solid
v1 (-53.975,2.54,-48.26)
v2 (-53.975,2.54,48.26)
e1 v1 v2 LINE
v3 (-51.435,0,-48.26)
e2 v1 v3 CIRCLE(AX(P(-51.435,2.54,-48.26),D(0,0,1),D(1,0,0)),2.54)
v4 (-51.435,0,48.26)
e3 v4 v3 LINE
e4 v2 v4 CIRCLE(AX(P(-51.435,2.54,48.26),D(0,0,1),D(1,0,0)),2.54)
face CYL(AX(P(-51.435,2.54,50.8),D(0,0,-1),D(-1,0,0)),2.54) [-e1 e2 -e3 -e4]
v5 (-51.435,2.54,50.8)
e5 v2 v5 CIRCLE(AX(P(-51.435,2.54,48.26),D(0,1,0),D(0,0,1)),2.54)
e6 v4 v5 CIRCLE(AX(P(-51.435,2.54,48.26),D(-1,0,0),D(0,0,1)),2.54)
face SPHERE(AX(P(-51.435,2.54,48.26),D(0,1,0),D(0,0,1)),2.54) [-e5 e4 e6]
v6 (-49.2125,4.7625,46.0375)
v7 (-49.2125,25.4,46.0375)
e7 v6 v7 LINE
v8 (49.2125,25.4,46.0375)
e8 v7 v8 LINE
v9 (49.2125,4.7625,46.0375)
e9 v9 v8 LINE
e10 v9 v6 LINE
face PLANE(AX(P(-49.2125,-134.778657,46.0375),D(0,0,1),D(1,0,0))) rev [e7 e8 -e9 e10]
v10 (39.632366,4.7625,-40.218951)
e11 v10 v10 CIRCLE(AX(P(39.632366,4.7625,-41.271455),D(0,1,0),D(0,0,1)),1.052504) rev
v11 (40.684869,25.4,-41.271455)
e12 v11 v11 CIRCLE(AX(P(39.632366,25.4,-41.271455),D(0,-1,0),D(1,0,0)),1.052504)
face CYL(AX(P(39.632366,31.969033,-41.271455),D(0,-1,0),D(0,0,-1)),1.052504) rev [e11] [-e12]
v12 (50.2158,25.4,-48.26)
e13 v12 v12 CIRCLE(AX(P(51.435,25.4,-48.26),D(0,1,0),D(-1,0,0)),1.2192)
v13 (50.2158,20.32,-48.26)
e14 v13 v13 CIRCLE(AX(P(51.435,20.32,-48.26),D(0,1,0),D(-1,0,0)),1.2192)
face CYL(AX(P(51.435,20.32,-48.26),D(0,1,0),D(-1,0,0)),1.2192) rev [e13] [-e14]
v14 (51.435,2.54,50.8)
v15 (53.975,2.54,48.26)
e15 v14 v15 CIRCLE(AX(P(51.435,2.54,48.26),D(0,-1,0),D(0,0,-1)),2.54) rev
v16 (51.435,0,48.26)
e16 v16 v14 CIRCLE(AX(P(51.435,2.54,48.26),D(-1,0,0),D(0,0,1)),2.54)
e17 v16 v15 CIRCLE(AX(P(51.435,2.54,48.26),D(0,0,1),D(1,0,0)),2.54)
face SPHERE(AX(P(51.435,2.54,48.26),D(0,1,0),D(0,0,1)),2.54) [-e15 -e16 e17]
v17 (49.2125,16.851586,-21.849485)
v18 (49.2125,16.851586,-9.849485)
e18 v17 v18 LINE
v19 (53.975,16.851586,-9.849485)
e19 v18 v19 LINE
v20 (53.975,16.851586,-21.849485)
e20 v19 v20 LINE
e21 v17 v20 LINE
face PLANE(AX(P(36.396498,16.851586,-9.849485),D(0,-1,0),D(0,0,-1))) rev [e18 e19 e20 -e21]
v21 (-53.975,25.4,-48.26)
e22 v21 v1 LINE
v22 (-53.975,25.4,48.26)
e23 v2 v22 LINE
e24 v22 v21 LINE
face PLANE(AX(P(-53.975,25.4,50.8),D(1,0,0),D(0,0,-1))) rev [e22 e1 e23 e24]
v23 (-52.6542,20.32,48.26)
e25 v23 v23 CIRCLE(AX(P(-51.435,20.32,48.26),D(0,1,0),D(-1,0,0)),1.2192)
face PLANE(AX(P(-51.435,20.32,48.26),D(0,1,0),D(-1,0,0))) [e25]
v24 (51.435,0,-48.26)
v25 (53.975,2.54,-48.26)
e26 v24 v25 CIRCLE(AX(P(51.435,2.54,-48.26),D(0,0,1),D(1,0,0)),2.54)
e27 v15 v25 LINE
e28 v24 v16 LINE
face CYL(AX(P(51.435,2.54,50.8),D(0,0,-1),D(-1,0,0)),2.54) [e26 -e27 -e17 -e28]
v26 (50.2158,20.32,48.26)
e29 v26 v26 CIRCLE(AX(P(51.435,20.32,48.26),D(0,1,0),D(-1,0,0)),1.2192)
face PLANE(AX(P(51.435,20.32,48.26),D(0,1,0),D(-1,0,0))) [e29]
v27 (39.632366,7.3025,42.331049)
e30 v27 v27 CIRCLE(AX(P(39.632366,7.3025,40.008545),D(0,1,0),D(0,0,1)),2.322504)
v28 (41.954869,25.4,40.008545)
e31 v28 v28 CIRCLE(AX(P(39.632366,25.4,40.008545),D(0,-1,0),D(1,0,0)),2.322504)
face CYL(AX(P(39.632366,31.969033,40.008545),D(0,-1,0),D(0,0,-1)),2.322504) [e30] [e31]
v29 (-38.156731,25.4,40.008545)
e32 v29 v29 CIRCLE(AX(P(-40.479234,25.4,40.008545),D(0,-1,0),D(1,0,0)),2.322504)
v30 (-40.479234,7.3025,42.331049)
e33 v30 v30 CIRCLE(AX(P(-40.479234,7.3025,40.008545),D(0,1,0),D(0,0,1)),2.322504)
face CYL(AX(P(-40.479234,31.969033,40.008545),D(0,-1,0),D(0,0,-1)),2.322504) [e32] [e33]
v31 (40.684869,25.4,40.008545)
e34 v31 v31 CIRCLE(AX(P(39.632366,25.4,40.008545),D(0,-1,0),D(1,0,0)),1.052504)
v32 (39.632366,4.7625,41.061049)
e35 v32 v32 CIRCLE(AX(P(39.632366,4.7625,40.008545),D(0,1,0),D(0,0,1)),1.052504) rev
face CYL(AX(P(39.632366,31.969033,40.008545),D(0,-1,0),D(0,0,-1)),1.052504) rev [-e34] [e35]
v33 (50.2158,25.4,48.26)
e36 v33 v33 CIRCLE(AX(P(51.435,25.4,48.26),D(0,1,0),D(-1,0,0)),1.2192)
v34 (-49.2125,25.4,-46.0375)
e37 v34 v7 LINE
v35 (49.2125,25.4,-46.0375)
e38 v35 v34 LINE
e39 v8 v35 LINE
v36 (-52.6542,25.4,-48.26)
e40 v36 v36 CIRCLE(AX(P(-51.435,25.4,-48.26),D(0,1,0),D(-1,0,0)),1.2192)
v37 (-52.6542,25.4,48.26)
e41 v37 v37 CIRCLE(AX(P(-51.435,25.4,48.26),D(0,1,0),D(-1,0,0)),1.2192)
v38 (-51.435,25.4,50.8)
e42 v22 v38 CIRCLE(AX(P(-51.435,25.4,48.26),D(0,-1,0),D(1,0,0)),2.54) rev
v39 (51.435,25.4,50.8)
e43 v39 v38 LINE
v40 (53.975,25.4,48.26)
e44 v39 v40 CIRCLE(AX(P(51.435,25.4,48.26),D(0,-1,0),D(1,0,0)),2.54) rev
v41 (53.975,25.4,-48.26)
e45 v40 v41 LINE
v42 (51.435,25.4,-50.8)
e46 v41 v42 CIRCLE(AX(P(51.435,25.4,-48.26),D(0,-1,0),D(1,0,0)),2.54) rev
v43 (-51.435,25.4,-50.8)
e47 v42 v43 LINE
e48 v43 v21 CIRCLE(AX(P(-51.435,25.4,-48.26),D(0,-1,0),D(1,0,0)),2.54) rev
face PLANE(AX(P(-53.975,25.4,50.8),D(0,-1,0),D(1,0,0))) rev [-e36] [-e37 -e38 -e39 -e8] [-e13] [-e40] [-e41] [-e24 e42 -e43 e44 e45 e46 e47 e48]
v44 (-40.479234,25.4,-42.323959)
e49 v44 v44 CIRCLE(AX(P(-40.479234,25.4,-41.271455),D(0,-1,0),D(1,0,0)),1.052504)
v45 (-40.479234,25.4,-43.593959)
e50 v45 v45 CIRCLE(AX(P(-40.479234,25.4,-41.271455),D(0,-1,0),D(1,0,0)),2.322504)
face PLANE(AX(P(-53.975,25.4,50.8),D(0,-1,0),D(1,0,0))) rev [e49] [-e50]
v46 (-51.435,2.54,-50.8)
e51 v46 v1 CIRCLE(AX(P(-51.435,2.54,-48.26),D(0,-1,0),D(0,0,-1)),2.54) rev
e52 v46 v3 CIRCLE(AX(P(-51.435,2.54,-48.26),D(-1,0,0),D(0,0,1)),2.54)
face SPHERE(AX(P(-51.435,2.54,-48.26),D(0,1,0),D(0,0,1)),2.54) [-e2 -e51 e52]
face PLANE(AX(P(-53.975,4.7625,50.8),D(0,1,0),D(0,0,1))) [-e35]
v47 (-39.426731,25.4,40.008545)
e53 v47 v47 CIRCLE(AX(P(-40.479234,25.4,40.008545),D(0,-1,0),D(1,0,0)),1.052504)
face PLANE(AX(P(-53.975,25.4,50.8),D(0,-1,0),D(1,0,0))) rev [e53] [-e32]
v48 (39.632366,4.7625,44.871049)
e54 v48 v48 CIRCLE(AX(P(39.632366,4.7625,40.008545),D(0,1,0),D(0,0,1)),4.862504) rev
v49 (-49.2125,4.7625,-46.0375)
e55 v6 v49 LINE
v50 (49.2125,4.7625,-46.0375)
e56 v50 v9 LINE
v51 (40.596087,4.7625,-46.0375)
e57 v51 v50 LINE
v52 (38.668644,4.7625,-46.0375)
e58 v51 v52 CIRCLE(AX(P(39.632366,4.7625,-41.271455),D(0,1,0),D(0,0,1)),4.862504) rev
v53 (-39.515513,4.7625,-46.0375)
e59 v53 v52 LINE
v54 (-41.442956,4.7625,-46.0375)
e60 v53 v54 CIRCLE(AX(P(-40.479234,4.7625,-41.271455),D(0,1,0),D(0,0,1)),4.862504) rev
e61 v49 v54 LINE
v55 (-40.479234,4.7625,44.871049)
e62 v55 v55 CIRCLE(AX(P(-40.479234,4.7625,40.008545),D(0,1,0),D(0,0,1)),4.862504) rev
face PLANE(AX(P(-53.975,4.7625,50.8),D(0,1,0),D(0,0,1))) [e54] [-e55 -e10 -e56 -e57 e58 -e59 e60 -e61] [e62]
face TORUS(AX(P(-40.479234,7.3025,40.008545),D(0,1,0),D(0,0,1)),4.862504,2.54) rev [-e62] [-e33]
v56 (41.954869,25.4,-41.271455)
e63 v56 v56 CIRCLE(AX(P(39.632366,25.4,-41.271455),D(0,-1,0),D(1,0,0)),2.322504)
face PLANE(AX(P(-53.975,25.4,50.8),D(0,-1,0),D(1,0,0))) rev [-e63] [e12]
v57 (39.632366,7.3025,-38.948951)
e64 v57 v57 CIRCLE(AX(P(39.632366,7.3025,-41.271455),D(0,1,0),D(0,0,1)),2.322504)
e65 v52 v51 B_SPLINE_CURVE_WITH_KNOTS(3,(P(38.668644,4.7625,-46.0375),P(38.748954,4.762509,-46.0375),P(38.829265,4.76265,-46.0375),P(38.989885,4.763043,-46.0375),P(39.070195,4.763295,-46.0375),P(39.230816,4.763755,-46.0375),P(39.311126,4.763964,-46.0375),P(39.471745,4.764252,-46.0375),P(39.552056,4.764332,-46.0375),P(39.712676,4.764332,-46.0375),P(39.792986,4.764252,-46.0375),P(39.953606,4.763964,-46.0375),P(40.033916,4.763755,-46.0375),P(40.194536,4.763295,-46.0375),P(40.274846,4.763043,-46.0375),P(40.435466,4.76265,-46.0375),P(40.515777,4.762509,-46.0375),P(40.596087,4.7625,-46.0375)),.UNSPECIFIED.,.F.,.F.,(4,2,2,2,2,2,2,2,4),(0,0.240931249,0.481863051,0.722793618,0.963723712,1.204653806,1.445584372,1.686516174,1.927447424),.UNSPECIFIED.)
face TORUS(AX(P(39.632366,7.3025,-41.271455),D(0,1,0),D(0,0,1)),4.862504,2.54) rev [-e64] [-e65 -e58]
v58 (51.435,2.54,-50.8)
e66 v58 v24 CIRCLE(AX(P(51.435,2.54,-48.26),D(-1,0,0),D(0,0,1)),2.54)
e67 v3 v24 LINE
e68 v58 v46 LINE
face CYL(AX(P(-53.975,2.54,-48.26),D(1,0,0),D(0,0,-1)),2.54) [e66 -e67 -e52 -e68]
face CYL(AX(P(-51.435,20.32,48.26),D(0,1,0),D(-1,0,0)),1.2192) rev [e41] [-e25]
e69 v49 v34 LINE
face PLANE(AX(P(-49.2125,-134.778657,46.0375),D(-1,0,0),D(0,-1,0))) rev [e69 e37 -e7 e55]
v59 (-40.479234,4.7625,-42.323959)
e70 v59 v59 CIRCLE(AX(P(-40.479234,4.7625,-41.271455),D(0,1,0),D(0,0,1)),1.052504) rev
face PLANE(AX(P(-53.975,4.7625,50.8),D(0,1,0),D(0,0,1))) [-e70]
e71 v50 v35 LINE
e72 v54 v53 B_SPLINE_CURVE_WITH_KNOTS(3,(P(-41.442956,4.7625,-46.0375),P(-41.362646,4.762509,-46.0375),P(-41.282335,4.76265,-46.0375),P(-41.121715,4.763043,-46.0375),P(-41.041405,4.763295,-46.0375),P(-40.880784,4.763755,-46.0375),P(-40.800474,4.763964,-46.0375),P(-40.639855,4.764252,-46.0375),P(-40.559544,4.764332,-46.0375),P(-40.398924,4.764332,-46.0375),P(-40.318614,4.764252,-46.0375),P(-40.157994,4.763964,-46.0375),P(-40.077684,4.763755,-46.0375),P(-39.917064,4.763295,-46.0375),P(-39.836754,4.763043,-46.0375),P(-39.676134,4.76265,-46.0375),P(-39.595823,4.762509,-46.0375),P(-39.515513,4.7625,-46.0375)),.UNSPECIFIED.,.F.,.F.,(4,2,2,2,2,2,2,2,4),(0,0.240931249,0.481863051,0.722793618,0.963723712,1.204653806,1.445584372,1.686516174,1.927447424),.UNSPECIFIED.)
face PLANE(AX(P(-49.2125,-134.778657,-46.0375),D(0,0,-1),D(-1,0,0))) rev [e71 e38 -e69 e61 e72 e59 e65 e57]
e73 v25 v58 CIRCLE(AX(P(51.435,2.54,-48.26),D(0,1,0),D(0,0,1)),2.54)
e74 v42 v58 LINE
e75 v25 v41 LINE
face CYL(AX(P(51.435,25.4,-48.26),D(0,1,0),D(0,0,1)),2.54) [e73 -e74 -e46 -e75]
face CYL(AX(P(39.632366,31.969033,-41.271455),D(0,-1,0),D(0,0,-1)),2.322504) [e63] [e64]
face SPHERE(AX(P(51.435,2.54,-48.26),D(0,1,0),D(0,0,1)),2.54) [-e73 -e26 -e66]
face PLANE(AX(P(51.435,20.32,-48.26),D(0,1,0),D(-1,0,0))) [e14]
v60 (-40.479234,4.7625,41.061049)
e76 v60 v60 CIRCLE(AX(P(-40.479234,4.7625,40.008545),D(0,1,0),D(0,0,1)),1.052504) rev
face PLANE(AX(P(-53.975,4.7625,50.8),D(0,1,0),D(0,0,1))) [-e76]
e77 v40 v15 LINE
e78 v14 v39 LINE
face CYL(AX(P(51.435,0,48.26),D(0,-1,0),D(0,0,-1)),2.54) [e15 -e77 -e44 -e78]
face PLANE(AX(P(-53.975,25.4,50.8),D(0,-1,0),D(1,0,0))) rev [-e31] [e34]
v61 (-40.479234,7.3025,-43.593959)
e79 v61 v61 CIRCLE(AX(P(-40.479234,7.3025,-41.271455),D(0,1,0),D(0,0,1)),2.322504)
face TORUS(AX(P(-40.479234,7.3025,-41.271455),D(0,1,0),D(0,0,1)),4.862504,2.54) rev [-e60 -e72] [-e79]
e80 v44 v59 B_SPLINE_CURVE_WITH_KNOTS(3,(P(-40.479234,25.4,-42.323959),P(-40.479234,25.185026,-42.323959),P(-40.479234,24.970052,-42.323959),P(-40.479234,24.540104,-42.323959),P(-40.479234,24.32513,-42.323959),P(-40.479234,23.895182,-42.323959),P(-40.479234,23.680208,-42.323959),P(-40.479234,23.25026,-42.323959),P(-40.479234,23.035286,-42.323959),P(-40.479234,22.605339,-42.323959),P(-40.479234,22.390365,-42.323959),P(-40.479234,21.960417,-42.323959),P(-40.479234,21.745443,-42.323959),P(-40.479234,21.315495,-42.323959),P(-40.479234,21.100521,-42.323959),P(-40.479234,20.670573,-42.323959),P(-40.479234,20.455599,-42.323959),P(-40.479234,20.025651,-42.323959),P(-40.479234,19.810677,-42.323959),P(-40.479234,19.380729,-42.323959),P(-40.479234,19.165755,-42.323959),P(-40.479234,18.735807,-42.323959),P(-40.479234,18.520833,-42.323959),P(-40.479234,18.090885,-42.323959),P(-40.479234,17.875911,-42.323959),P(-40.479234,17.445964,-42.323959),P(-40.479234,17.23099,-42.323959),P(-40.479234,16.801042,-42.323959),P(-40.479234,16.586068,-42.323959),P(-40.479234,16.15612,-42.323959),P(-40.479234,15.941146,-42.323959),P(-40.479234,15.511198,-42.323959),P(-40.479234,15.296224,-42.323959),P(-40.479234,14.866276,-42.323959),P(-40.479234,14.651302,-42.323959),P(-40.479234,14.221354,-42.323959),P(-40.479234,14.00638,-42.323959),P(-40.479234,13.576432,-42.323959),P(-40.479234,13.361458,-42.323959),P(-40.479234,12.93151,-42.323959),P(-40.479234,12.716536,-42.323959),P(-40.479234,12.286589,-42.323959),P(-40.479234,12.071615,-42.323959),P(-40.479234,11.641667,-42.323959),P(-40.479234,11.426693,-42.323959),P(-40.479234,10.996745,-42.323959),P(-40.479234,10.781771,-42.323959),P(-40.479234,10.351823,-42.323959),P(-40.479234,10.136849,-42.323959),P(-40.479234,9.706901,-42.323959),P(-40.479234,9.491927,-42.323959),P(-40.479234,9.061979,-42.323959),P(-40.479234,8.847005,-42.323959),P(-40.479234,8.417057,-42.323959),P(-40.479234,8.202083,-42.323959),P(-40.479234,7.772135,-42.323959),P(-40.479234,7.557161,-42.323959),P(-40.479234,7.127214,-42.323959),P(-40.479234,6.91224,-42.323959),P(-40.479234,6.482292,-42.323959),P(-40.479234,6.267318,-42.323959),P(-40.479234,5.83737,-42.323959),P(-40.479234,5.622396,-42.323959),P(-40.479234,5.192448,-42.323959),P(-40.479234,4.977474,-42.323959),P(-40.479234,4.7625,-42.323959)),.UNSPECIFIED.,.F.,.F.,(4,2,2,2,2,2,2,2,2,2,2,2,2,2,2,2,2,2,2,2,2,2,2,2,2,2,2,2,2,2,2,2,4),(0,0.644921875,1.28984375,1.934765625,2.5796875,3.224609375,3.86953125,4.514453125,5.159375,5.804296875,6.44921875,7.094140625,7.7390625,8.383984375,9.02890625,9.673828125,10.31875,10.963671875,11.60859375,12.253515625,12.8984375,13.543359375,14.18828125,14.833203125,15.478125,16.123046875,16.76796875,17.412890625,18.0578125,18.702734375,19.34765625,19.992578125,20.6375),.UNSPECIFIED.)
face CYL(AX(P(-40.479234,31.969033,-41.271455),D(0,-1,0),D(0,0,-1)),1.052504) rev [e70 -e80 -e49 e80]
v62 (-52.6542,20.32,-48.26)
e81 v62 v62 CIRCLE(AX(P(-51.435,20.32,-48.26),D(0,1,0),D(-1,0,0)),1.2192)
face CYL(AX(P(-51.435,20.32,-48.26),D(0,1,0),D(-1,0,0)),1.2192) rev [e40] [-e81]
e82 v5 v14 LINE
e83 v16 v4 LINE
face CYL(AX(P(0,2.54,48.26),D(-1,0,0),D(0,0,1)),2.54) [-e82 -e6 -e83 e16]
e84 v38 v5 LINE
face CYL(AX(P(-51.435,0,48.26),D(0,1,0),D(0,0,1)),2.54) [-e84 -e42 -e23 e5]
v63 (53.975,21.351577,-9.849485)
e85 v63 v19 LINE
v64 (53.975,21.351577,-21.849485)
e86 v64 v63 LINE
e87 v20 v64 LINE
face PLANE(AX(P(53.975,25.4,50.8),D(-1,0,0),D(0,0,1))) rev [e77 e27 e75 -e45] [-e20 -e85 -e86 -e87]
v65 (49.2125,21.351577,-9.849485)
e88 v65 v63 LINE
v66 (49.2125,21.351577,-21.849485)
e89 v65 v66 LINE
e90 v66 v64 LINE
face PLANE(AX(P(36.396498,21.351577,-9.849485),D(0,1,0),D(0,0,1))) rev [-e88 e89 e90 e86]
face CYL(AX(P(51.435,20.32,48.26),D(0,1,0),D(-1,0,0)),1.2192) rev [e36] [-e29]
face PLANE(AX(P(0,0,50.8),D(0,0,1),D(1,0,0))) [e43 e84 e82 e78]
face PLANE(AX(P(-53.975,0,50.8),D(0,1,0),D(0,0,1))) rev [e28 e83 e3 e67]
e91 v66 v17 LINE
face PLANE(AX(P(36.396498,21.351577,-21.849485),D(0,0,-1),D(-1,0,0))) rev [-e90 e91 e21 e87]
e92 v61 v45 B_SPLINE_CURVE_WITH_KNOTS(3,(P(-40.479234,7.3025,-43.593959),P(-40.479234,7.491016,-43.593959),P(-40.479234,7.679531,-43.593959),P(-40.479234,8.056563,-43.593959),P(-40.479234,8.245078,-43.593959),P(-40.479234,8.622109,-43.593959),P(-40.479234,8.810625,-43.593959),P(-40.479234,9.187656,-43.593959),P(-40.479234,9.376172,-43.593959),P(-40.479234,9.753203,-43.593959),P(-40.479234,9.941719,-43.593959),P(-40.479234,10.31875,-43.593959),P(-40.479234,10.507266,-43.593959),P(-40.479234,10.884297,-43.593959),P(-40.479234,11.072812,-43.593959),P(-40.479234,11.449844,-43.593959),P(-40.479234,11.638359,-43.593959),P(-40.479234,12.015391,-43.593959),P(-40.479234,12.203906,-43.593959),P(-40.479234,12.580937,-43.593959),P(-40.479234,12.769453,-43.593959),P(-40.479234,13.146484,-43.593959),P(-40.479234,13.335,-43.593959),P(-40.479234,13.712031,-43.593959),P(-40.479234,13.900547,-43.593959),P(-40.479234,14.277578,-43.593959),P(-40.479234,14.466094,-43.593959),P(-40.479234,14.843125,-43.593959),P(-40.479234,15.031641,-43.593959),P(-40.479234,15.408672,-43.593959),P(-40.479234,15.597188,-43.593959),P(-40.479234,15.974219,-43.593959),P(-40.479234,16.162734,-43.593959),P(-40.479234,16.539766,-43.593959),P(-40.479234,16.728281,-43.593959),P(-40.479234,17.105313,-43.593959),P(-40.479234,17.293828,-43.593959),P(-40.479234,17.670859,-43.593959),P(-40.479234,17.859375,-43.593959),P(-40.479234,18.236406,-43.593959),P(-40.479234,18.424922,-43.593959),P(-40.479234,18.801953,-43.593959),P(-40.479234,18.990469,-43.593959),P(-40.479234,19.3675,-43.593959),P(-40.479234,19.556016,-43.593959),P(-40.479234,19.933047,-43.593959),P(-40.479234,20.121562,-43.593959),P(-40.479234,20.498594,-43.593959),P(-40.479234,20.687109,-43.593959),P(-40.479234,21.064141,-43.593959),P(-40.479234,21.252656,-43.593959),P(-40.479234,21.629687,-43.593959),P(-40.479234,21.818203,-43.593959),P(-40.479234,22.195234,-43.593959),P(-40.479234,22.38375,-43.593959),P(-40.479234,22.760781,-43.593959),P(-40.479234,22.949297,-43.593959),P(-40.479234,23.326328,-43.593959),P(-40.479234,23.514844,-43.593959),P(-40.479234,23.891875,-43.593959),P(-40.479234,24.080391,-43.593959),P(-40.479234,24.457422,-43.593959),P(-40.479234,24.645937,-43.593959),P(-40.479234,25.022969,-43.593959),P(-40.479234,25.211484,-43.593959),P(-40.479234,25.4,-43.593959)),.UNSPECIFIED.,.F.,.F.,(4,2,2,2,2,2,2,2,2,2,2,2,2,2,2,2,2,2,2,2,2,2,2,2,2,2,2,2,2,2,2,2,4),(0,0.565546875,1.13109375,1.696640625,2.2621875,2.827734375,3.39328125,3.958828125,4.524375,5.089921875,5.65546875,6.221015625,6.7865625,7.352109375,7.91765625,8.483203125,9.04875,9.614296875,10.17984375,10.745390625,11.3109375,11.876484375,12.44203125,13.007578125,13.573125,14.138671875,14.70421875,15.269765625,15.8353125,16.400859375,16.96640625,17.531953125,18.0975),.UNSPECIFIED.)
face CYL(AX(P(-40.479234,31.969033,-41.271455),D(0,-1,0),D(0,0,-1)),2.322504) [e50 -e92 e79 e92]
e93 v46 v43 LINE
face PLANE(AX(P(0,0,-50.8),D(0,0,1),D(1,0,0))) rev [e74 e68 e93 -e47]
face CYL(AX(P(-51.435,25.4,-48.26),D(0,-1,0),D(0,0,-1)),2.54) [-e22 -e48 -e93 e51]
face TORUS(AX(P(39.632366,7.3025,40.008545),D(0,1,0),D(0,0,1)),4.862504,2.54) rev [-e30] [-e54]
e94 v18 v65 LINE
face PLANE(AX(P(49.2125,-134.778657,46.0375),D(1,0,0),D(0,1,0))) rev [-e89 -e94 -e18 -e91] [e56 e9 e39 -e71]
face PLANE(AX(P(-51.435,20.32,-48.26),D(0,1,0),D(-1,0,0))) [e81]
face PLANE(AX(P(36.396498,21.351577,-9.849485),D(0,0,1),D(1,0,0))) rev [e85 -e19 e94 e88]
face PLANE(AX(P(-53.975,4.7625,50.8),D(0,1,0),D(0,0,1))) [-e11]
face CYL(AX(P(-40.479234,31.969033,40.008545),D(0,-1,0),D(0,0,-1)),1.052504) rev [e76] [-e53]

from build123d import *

# Parameters (mm, degrees)
SKETCH1_W            = 107.95
SKETCH1_H            = 25.4
BOSS_EXTRUDE1_DEPTH  = 50.8
SKETCH2_W            = 98.425
SKETCH2_H            = 92.075
CUT_EXTRUDE1_DEPTH   = 20.6375
FILLET1_R            = 2.54
FILLET2_R            = 2.54
SKETCH8_R            = 1.2192
CUT_EXTRUDE2_DEPTH   = 5.08
SKETCH9_R            = 2.322503919
SKETCH9_R_2          = 1.052503919
BOSS_EXTRUDE2_DEPTH  = 20.6375
LPATTERN1_COUNT      = 2
LPATTERN1_PITCH      = 80.1116
LPATTERN1_COUNT_DIR2 = 2
LPATTERN1_PITCH_DIR2 = 81.28
SKETCH10_W           = 12
SKETCH10_H           = 4.499991
CUT_EXTRUDE3_DEPTH   = 4.7625
FILLET3_R            = 2.54


with BuildPart() as part:
    # Sketch1 → Boss-Extrude1 (new, symmetric)
    with BuildSketch(Plane.XY):
        with Locations((0, 12.7)):
            Rectangle(SKETCH1_W, SKETCH1_H)
    extrude(amount=BOSS_EXTRUDE1_DEPTH, both=True)

    # Sketch2 → Cut-Extrude1 (cut)
    with BuildSketch(Plane(origin=(0, 25.4, 0), x_dir=(1, 0, 0), z_dir=(0, 1, 0))):
        Rectangle(SKETCH2_W, SKETCH2_H)
    extrude(amount=-CUT_EXTRUDE1_DEPTH, mode=Mode.SUBTRACT)

    # Fillet1
    fillet1_edges = [part.edges().sort_by_distance(p)[0] for p in [
        (53.975, 12.7, 50.8),
        (-53.975, 12.7, 50.8),
        (53.975, 12.7, -50.8),
        (-53.975, 12.7, -50.8),
    ]]
    fillet(fillet1_edges, radius=FILLET1_R)

    # Fillet2
    fillet2_edges = [part.edges().sort_by_distance(p)[0] for p in [
        (53.975, 0, 0),
        (0, 0, -50.8),
        (0, 0, 50.8),
        (-53.975, 0, 0),
        (53.231051224, 0, 50.056051224),
        (-53.231051224, 0, 50.056051224),
        (-53.231051224, 0, -50.056051224),
        (53.231051224, 0, -50.056051224),
    ]]
    fillet(fillet2_edges, radius=FILLET2_R)

    # Sketch8 → Cut-Extrude2 (cut)
    with BuildSketch(Plane(origin=(0, 25.4, 0), x_dir=(1, 0, 0), z_dir=(0, 1, 0))):
        with Locations(Location((-51.435, -48.26, 0), (0, 0, 180))):
            Circle(SKETCH8_R)
        with Locations(Location((51.435, -48.26, 0), (0, 0, 180))):
            Circle(SKETCH8_R)
        with Locations(Location((-51.435, 48.26, 0), (0, 0, 180))):
            Circle(SKETCH8_R)
        with Locations(Location((51.435, 48.26, 0), (0, 0, 180))):
            Circle(SKETCH8_R)
    extrude(amount=-CUT_EXTRUDE2_DEPTH, mode=Mode.SUBTRACT)

    # Sketch9 → Boss-Extrude2 (add)
    with BuildSketch(Plane(origin=(0, 4.7625, 0), x_dir=(1, 0, 0), z_dir=(0, 1, 0))):
        with Locations(Location((-40.479234444, 41.271455009, 0), (0, 0, 90))):
            Circle(SKETCH9_R)
        with Locations(Location((-40.479234444, 41.271455009, 0), (0, 0, 90))):
            Circle(SKETCH9_R_2, mode=Mode.SUBTRACT)
    boss_extrude2 = extrude(amount=BOSS_EXTRUDE2_DEPTH)

    # LPattern1: Boss-Extrude2 2 × 2
    with Locations(*[(i * LPATTERN1_PITCH, 0, j * LPATTERN1_PITCH_DIR2) for i in range(LPATTERN1_COUNT) for j in range(LPATTERN1_COUNT_DIR2) if (i, j) != (0, 0)]):
        add(boss_extrude2)

    # Sketch10 → Cut-Extrude3 (cut)
    with BuildSketch(Plane(origin=(53.975, 0, 0), x_dir=(0, 0, -1), z_dir=(1, 0, 0))):
        with Locations((15.849485077, 19.101581537)):
            Rectangle(SKETCH10_W, SKETCH10_H)
    extrude(amount=-CUT_EXTRUDE3_DEPTH, mode=Mode.SUBTRACT)

    # Fillet3
    # the kernel refuses this fillet: 2.54 mm, written as the material it adds along each edge
    with BuildSketch(Plane(origin=(-40.479234444, 4.7625, -41.271455009), x_dir=(0, 0, -1), z_dir=(1, 0, 0))) as fillet3_piece_1:
        with BuildLine():
            CenterArc((2.322503919 + FILLET3_R, FILLET3_R), FILLET3_R, 180, 90)
            Line((2.322503919, FILLET3_R), (2.322503919, 0))
            Line((2.322503919, 0), (2.322503919 + FILLET3_R, 0))
        make_face()
    revolve(axis=Axis((-40.479234444, 4.7625, -41.271455009), (0, 1, 0)))
    with BuildSketch(Plane(origin=(-40.479234444, 4.7625, 40.008544991), x_dir=(0, 0, -1), z_dir=(1, 0, 0))) as fillet3_piece_2:
        with BuildLine():
            CenterArc((2.322503919 + FILLET3_R, FILLET3_R), FILLET3_R, 180, 90)
            Line((2.322503919, FILLET3_R), (2.322503919, 0))
            Line((2.322503919, 0), (2.322503919 + FILLET3_R, 0))
        make_face()
    revolve(axis=Axis((-40.479234444, 4.7625, 40.008544991), (0, 1, 0)))
    with BuildSketch(Plane(origin=(39.632365556, 4.7625, -41.271455009), x_dir=(0, 0, -1), z_dir=(1, 0, 0))) as fillet3_piece_3:
        with BuildLine():
            CenterArc((2.322503919 + FILLET3_R, FILLET3_R), FILLET3_R, 180, 90)
            Line((2.322503919, FILLET3_R), (2.322503919, 0))
            Line((2.322503919, 0), (2.322503919 + FILLET3_R, 0))
        make_face()
    revolve(axis=Axis((39.632365556, 4.7625, -41.271455009), (0, 1, 0)))
    with BuildSketch(Plane(origin=(39.632365556, 4.7625, 40.008544991), x_dir=(0, 0, -1), z_dir=(1, 0, 0))) as fillet3_piece_4:
        with BuildLine():
            CenterArc((2.322503919 + FILLET3_R, FILLET3_R), FILLET3_R, 180, 90)
            Line((2.322503919, FILLET3_R), (2.322503919, 0))
            Line((2.322503919, 0), (2.322503919 + FILLET3_R, 0))
        make_face()
    revolve(axis=Axis((39.632365556, 4.7625, 40.008544991), (0, 1, 0)))


solid = part.part
